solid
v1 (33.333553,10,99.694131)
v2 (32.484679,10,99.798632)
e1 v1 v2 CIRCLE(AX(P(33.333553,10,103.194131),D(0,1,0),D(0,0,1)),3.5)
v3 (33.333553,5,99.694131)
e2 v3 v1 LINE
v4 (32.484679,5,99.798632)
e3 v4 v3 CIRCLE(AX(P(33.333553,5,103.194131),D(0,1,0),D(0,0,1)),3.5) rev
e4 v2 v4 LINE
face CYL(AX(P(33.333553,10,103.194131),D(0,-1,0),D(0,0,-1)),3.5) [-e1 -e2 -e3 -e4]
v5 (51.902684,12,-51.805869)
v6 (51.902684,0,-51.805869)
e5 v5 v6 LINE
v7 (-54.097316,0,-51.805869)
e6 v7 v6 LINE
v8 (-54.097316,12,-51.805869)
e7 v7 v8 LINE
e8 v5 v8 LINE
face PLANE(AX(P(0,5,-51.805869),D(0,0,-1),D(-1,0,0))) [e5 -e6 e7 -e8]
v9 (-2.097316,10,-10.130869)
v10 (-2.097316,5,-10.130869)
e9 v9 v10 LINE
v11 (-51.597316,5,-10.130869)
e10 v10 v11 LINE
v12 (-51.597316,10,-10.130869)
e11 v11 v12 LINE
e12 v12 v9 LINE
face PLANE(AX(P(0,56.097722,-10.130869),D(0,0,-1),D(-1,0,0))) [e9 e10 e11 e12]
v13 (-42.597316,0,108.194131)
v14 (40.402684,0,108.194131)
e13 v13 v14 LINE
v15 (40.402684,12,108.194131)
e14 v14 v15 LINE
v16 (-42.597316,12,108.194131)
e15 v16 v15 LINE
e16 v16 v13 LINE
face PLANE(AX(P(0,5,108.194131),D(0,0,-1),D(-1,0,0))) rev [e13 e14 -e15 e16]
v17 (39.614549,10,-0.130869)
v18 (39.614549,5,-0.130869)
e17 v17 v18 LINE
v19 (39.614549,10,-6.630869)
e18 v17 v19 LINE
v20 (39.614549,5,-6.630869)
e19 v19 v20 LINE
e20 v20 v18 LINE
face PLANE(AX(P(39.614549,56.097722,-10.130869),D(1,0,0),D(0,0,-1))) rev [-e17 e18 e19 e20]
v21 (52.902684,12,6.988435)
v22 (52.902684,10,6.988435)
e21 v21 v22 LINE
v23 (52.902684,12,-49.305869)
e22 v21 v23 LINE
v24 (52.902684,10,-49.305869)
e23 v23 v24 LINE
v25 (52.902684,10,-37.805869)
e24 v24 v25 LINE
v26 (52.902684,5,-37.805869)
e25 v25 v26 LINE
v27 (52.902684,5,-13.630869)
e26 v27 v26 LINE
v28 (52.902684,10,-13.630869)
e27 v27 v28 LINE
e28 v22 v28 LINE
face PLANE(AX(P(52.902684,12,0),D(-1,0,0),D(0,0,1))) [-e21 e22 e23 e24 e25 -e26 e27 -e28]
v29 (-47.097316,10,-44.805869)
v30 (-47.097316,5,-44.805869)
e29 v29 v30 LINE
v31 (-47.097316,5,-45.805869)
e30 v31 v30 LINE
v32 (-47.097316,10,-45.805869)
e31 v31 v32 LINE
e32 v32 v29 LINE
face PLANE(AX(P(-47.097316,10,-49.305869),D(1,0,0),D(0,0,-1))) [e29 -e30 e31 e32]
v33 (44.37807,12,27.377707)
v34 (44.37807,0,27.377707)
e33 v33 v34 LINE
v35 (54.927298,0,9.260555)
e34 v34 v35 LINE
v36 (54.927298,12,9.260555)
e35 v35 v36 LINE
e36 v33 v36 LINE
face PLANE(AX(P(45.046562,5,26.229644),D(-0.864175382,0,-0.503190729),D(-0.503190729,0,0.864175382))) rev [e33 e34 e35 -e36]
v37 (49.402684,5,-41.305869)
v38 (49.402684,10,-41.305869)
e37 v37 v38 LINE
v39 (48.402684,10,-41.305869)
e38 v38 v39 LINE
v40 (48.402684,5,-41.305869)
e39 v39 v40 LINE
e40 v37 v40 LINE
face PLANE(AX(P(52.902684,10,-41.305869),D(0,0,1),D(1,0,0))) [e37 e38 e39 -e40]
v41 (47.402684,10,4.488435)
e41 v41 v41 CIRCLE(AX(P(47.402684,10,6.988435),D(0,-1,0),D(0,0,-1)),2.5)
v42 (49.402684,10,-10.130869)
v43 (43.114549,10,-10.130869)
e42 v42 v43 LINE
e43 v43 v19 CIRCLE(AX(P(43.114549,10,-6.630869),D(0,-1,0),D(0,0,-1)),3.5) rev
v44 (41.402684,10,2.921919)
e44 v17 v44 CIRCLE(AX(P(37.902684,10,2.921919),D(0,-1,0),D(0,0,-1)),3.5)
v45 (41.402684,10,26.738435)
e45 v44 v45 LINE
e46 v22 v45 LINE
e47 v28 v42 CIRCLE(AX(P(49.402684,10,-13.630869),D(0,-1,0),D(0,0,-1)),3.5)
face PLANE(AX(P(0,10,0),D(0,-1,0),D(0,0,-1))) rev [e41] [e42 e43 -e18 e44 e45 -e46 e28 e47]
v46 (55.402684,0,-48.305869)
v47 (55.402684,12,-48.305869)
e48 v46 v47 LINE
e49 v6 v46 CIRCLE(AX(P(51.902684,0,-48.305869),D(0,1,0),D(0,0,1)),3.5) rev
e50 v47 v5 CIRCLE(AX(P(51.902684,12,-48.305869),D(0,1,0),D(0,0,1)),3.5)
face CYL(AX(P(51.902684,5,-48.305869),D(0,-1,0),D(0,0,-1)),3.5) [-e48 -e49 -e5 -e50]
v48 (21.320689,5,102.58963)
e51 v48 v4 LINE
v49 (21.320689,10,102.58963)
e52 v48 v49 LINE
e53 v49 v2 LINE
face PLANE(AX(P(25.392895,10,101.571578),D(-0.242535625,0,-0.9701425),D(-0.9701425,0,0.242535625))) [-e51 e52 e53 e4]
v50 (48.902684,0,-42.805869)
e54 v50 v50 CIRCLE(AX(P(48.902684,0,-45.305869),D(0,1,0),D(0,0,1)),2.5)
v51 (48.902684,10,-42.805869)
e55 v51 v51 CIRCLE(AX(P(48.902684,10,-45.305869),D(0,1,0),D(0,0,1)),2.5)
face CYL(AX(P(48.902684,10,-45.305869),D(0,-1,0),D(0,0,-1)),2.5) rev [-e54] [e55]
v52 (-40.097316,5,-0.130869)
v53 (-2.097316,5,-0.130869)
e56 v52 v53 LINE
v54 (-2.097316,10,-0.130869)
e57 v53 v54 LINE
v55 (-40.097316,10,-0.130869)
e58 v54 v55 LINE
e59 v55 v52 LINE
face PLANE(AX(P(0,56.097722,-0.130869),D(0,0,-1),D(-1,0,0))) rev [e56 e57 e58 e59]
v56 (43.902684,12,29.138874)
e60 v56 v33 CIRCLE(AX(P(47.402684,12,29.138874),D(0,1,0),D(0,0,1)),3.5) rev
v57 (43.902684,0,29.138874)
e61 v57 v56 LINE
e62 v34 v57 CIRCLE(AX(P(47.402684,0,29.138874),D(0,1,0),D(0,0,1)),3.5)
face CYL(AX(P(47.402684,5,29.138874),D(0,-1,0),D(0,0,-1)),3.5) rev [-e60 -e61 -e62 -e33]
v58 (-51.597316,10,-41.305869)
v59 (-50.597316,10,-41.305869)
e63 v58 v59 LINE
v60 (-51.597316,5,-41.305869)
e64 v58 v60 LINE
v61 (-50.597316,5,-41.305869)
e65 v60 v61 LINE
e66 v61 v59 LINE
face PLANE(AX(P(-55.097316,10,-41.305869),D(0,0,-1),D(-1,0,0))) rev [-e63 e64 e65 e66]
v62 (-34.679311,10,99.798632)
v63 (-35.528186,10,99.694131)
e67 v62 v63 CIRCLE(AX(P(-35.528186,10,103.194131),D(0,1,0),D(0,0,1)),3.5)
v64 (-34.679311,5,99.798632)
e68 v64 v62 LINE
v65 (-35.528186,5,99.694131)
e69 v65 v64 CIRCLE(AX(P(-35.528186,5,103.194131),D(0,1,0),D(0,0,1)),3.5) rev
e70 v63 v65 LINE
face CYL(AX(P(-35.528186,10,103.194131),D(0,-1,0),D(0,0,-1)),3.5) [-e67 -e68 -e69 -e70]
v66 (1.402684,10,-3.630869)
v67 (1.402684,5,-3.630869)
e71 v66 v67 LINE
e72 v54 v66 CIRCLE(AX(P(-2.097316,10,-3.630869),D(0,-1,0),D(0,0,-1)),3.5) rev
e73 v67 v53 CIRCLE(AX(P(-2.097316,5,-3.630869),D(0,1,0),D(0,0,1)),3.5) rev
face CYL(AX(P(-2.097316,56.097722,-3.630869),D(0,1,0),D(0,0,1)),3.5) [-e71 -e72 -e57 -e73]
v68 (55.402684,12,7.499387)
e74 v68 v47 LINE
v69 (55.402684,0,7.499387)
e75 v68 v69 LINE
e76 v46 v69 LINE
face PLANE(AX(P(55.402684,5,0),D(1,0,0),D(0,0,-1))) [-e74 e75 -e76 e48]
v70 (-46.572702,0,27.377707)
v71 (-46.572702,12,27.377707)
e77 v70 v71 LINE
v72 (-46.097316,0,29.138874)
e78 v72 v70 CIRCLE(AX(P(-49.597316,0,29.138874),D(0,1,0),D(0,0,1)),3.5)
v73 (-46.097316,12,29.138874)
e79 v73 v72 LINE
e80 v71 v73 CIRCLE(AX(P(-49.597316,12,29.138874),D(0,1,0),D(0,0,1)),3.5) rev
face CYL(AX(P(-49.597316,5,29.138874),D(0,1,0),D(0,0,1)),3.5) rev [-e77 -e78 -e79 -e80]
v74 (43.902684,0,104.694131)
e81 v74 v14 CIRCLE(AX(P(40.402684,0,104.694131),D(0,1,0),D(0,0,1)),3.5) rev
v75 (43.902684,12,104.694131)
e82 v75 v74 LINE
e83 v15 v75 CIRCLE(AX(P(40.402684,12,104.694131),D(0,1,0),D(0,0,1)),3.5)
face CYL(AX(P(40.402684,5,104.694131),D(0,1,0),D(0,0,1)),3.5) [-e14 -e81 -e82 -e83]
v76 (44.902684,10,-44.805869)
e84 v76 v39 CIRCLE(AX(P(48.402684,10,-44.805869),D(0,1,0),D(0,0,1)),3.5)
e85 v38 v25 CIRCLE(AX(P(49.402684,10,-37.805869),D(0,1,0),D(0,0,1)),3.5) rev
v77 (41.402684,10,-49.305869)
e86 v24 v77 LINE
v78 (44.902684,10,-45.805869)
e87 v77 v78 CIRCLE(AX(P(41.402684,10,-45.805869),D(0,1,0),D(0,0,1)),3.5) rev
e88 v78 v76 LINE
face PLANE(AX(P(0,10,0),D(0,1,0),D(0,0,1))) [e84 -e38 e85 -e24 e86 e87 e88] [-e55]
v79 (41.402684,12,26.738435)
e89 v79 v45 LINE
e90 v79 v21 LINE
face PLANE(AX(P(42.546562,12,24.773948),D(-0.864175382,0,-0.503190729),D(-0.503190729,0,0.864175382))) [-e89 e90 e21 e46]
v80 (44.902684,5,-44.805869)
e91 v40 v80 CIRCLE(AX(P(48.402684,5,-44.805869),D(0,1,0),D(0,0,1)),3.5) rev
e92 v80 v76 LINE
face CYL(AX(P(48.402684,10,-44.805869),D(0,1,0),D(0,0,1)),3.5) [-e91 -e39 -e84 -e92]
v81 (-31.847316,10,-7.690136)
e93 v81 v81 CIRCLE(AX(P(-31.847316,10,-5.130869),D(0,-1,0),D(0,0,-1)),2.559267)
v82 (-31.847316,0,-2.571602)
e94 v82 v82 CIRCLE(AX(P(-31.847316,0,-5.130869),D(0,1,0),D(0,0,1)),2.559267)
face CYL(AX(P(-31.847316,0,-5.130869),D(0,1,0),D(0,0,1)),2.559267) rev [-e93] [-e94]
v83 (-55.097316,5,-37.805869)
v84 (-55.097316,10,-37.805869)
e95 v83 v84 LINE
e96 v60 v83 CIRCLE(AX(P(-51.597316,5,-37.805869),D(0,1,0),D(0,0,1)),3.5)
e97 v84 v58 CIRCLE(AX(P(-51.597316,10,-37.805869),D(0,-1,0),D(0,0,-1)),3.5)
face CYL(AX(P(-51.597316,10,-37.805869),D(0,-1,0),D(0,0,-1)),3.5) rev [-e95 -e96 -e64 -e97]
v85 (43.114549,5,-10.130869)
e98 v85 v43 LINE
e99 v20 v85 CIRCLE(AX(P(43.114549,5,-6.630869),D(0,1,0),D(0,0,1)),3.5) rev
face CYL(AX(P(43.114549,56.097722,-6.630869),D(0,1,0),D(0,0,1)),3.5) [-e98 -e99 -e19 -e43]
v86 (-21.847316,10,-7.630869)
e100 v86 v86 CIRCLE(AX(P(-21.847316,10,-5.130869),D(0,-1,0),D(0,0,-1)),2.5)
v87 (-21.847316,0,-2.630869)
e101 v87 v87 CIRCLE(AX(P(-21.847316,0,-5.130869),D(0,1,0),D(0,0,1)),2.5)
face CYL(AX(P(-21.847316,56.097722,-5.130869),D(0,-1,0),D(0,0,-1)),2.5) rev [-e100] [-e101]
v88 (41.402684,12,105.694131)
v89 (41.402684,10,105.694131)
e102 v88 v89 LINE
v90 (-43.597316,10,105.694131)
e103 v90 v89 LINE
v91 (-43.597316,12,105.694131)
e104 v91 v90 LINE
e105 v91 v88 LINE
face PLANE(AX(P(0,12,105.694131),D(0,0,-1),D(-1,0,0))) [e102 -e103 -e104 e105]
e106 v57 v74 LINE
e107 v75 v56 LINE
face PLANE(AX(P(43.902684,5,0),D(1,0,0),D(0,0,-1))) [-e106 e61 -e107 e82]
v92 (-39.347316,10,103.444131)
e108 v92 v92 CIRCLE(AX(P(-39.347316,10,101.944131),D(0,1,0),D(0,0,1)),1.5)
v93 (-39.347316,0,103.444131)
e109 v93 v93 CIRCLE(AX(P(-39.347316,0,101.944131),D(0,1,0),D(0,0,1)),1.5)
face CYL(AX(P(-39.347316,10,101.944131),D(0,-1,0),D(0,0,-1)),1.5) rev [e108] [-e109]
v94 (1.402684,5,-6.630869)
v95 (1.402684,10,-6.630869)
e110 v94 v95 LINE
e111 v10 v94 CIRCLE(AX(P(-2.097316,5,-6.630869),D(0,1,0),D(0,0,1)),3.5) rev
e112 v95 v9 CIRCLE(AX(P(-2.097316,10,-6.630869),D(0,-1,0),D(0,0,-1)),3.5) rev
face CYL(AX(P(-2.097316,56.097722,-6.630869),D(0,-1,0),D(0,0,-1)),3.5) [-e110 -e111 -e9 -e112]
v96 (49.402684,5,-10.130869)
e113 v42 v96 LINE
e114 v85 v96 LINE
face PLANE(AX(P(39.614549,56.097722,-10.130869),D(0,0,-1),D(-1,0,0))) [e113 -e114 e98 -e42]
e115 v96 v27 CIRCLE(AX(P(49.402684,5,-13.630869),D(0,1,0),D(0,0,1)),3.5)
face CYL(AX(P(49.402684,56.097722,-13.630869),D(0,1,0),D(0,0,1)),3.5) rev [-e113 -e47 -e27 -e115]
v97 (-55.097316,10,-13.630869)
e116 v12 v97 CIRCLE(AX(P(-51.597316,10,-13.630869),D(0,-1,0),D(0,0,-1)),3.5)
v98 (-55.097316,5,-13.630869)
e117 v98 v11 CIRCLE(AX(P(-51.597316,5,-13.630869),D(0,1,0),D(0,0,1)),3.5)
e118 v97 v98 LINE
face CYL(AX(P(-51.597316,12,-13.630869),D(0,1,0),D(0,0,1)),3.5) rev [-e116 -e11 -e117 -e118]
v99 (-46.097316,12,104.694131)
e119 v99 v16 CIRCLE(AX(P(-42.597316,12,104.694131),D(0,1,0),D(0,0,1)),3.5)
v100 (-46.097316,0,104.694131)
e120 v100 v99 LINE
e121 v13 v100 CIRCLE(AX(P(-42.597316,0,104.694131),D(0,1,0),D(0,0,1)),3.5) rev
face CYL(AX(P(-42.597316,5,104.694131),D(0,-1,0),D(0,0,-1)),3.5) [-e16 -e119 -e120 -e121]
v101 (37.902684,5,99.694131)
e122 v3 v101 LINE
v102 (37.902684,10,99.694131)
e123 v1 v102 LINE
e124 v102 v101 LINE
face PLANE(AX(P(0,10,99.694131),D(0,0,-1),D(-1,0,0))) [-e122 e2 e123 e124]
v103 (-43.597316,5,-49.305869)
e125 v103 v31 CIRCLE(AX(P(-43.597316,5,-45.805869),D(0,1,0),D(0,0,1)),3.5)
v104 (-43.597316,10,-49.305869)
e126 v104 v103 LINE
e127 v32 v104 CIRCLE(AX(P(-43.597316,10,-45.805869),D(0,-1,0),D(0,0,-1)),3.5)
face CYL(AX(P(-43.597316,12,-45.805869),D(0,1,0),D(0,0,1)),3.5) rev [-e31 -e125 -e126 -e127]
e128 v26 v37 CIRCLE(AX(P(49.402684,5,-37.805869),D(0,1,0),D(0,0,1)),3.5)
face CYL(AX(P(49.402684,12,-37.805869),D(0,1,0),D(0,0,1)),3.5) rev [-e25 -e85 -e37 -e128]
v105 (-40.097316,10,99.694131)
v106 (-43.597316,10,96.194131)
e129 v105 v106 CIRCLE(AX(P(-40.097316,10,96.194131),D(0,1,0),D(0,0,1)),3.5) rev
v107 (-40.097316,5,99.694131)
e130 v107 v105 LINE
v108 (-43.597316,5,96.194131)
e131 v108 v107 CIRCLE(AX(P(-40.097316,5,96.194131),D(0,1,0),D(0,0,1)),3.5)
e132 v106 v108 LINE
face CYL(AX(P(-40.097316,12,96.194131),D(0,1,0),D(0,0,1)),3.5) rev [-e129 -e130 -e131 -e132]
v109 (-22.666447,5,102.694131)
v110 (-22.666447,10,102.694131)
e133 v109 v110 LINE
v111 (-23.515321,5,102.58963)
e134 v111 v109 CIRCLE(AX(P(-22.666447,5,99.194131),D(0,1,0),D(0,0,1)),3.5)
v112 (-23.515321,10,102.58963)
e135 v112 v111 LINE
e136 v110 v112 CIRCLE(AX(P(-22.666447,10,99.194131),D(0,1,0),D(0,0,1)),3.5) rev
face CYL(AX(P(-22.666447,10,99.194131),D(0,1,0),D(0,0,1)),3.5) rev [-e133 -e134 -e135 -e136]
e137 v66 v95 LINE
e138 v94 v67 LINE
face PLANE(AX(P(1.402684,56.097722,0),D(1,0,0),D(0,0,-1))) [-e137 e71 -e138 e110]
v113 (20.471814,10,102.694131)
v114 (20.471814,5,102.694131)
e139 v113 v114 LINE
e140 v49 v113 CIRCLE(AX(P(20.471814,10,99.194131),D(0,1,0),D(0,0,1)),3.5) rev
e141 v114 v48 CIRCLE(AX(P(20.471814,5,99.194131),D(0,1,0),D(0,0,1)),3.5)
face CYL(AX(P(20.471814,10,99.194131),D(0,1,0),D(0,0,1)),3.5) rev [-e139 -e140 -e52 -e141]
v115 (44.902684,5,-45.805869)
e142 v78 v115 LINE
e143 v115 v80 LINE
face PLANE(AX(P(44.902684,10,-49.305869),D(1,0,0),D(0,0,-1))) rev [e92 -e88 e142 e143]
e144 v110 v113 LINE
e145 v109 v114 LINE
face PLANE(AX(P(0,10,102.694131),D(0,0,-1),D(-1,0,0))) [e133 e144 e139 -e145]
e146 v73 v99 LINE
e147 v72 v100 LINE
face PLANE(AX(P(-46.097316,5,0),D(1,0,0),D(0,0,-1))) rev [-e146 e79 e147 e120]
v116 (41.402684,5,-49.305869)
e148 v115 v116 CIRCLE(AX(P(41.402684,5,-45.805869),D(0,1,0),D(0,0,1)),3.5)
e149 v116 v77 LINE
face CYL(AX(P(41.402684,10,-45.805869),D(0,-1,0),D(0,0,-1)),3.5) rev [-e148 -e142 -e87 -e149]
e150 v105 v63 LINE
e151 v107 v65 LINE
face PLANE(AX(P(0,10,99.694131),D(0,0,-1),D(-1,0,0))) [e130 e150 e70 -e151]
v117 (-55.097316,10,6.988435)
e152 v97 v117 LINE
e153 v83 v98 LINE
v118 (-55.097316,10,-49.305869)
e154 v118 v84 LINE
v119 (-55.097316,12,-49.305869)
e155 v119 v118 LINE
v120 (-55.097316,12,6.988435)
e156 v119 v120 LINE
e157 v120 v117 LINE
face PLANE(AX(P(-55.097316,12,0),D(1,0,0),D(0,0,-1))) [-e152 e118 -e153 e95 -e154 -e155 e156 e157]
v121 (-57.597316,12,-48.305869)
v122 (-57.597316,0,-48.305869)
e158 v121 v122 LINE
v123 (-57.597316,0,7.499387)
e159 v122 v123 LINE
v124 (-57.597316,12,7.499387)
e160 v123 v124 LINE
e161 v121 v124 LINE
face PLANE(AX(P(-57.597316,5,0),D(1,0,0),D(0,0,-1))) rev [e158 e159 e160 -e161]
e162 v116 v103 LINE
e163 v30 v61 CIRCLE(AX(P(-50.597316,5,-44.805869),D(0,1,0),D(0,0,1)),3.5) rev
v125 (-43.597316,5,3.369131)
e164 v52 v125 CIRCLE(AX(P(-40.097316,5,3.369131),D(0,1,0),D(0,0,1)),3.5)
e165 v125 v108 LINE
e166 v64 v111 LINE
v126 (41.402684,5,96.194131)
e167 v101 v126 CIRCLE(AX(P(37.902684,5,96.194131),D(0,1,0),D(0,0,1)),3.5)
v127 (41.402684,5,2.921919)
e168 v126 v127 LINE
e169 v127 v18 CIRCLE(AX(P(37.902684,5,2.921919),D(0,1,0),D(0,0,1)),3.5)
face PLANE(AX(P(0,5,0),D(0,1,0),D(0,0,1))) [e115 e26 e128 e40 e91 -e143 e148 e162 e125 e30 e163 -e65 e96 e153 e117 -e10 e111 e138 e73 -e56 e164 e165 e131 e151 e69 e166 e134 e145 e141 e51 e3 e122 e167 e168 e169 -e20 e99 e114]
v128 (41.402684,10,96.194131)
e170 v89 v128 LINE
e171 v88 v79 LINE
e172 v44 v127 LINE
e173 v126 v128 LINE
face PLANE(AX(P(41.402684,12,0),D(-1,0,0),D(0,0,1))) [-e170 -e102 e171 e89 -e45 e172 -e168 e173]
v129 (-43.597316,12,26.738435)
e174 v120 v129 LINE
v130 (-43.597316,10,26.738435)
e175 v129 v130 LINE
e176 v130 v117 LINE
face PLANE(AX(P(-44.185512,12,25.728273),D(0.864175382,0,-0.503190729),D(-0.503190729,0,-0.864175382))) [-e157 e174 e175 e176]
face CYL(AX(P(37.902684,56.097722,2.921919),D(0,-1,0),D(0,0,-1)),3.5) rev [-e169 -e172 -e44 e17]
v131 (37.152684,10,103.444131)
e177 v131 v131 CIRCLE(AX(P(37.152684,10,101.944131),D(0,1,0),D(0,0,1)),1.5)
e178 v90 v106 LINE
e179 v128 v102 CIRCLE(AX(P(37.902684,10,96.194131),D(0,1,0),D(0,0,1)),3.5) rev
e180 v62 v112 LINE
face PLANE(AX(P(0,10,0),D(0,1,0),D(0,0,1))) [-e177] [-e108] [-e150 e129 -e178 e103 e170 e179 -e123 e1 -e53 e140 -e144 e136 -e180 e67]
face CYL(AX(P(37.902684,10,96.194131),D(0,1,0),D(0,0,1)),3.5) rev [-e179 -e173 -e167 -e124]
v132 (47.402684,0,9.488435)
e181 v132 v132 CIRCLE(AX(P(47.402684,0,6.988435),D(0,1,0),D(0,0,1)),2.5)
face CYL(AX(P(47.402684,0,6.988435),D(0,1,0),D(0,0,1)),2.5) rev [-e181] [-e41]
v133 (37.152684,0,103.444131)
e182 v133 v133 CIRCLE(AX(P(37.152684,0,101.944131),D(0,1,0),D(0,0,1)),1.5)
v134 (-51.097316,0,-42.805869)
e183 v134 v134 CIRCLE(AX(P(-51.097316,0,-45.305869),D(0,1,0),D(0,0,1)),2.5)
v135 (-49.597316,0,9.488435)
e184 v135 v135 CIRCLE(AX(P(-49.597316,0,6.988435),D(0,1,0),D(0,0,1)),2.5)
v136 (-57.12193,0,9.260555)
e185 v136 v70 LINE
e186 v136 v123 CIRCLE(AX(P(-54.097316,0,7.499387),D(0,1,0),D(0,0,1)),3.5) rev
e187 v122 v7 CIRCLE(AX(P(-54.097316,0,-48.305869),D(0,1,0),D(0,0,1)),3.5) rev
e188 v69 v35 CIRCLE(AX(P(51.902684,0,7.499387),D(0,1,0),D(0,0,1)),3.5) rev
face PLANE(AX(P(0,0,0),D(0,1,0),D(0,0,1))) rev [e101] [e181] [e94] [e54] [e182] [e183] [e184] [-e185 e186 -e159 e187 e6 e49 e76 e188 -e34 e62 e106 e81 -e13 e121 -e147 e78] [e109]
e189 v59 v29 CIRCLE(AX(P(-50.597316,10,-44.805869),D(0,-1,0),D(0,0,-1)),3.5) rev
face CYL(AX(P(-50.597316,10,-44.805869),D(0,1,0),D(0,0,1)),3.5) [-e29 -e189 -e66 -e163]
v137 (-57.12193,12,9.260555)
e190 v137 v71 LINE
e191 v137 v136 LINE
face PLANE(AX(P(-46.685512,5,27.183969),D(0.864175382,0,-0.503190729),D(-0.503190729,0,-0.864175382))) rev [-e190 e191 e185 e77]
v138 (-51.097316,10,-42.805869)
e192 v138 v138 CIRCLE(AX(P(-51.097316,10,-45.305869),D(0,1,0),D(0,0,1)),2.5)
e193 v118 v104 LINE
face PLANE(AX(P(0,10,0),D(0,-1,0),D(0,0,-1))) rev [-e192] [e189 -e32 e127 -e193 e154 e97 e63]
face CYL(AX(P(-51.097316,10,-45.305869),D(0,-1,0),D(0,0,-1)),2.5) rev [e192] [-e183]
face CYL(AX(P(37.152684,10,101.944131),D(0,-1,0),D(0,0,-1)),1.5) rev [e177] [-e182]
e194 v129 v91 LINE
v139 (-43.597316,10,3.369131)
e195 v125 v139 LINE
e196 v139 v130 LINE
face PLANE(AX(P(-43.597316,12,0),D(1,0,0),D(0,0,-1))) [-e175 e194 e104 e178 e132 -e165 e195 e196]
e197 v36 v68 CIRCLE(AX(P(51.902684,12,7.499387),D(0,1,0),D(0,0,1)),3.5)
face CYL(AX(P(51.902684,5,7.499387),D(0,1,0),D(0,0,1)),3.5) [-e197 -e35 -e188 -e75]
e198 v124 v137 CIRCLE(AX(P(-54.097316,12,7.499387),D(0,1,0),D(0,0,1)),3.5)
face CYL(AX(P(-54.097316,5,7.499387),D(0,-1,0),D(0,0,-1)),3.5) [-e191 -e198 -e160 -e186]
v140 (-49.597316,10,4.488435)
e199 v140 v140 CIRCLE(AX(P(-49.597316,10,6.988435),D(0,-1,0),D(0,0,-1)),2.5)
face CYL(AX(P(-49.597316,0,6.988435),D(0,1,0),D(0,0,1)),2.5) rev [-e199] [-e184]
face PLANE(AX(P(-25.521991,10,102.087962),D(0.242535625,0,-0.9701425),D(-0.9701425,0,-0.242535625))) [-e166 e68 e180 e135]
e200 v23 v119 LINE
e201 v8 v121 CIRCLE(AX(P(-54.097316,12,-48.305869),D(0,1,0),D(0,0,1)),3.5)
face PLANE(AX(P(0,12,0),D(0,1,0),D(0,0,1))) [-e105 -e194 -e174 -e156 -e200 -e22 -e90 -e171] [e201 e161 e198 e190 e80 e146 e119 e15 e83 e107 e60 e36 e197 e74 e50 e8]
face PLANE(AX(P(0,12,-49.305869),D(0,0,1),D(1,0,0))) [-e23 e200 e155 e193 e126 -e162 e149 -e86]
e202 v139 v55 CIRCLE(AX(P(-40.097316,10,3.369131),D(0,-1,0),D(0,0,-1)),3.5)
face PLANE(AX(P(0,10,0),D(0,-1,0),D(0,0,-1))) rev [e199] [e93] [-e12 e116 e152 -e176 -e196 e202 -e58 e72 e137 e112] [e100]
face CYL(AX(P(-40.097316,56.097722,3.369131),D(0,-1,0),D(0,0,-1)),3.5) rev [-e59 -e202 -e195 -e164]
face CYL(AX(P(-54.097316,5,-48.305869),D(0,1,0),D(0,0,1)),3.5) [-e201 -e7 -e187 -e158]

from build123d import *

# Parameters (mm, degrees)
BOSS_EXTRUDE1_DEPTH     = 5
BOSS_EXTRUDE2_DEPTH     = 7
SKETCH3_R               = 1.5
SKETCH3_W               = 8
SKETCH3_H               = 8
SKETCH3_R_2             = 2.5
BOSS_EXTRUDE3_DEPTH     = 5
SKETCH4_R               = 2.5
BOSS_EXTRUDE4_DEPTH     = 5
CUT_EXTRUDE1_DEPTH      = 123.769787834
CUT_EXTRUDE1_DEPTH_BACK = 123.769787834
SKETCH5_R               = 2.5
SKETCH5_R_2             = 2.55926668
SKETCH5_R_3             = 1.5
FILLET1_R               = 3.5


with BuildPart() as part:
    # Sketch1 → Boss-Extrude1 (new body)
    with BuildSketch(Plane(origin=(0, 0, 0), x_dir=(1, 0, 0), z_dir=(0, 1, 0))):
        Polygon((-57.597316241, 51.805869074), (-57.597316241, -8.444130926), (-46.097316241, -28.194130926), (-46.097316241, -108.194130926), (43.902683759, -108.194130926), (43.902683759, -28.194130926), (55.402683759, -8.444130926), (55.402683759, 51.805869074), align=None)
    extrude(amount=BOSS_EXTRUDE1_DEPTH)

    # Sketch2 → Boss-Extrude2 (add)
    with BuildSketch(Plane(origin=(0, 5, 0), x_dir=(1, 0, 0), z_dir=(0, 1, 0))):
        Polygon((-46.097316241, -28.194130926), (-46.097316241, -108.194130926), (43.902683759, -108.194130926), (43.902683759, -28.194130926), (41.402683759, -28.194130926), (41.402683759, -105.694130926), (-43.597316241, -105.694130926), (-43.597316241, -28.194130926), align=None)
        Polygon((52.902683759, -6.988434723), (55.402683759, -8.444130926), (43.902683759, -28.194130926), (41.402683759, -26.738434723), align=None)
        Polygon((41.402683759, -28.194130926), (43.902683759, -28.194130926), (41.402683759, -26.738434723), align=None)
        Polygon((52.902683759, -6.988434723), (55.402683759, -8.444130926), (55.402683759, -6.988434723), align=None)
        Polygon((-57.597316241, 51.805869074), (-57.597316241, -6.988434723), (-55.097316241, -6.988434723), (-55.097316241, 49.305869074), (52.902683759, 49.305869074), (52.902683759, -6.988434723), (55.402683759, -6.988434723), (55.402683759, 51.805869074), align=None)
        Polygon((-43.597316241, -26.738434723), (-46.097316241, -28.194130926), (-43.597316241, -28.194130926), align=None)
        Polygon((-43.597316241, -26.738434723), (-46.097316241, -28.194130926), (-57.597316241, -8.444130926), (-55.097316241, -6.988434723), align=None)
        Polygon((-57.597316241, -6.988434723), (-57.597316241, -8.444130926), (-55.097316241, -6.988434723), align=None)
    extrude(amount=BOSS_EXTRUDE2_DEPTH)

    # Sketch3 → Boss-Extrude3 (add)
    # profile 1 of 3: a face of its own
    with BuildSketch(Plane(origin=(0, 5, 0), x_dir=(1, 0, 0), z_dir=(0, 1, 0))):
        Polygon((-43.597316241, -99.694130926), (-43.597316241, -105.694130926), (41.402683759, -105.694130926), (41.402683759, -99.694130926), (32.902683759, -99.694130926), (20.902683759, -102.694130926), (-23.097316241, -102.694130926), (-35.097316241, -99.694130926), align=None)
        with Locations(Location((-39.347316241, -101.944130926, 0), (0, 0, 270))):
            Circle(SKETCH3_R, mode=Mode.SUBTRACT)
        with Locations(Location((37.152683759, -101.944130926, 0), (0, 0, 270))):
            Circle(SKETCH3_R, mode=Mode.SUBTRACT)
    # profile 2 of 3: a face of its own
    with BuildSketch(Plane(origin=(0, 5, 0), x_dir=(1, 0, 0), z_dir=(0, 1, 0))):
        with Locations((-51.097316241, 45.305869074)):
            Rectangle(SKETCH3_W, SKETCH3_H)
        with Locations(Location((-51.097316241, 45.305869074, 0), (0, 0, 270))):
            Circle(SKETCH3_R_2, mode=Mode.SUBTRACT)
    # profile 3 of 3: a face of its own
    with BuildSketch(Plane(origin=(0, 5, 0), x_dir=(1, 0, 0), z_dir=(0, 1, 0))):
        with Locations((48.902683759, 45.305869074)):
            Rectangle(SKETCH3_W, SKETCH3_H)
        with Locations(Location((48.902683759, 45.305869074, 0), (0, 0, 270))):
            Circle(SKETCH3_R_2, mode=Mode.SUBTRACT)
    extrude(amount=BOSS_EXTRUDE3_DEPTH)

    # Sketch4 → Boss-Extrude4 (add)
    # profile 1 of 2: a face of its own
    with BuildSketch(Plane(origin=(0, 5, 0), x_dir=(1, 0, 0), z_dir=(0, 1, 0))):
        Polygon((1.402683759, 10.130869074), (-55.097316241, 10.130869074), (-55.097316241, -6.988434723), (-43.597316241, -26.738434723), (-43.597316241, 0.130869074), (1.402683759, 0.130869074), align=None)
        with Locations(Location((-31.847316241, 5.130869074, 0), (0, 0, 90))):
            Circle(SKETCH4_R, mode=Mode.SUBTRACT)
        with Locations(Location((-21.847316241, 5.130869074, 0), (0, 0, 90))):
            Circle(SKETCH4_R, mode=Mode.SUBTRACT)
    # profile 2 of 2: a face of its own
    with BuildSketch(Plane(origin=(0, 5, 0), x_dir=(1, 0, 0), z_dir=(0, 1, 0))):
        Polygon((39.6145491, 10.130869074), (39.6145491, 0.130869074), (41.402683759, 0.130869074), (41.402683759, -26.738434723), (52.902683759, -6.988434723), (52.902683759, 10.130869074), align=None)
    extrude(amount=BOSS_EXTRUDE4_DEPTH)

    # Sketch5 → Cut-Extrude1 (cut, two sides: drawn at the far end of the back side and taken through both)
    with BuildSketch(Plane(origin=(0, 5, 0), x_dir=(1, 0, 0), z_dir=(0, 1, 0)).offset(-CUT_EXTRUDE1_DEPTH_BACK)):
        with Locations(Location((-21.847316241, 5.130869074, 0), (0, 0, 90))):
            Circle(SKETCH5_R)
        with Locations(Location((-31.847316241, 5.130869074, 0), (0, 0, 270))):
            Circle(SKETCH5_R_2)
        with Locations(Location((-39.347316241, -101.944130926, 0), (0, 0, 270))):
            Circle(SKETCH5_R_3)
        with Locations(Location((37.152683759, -101.944130926, 0), (0, 0, 270))):
            Circle(SKETCH5_R_3)
        with Locations(Location((-51.097316241, 45.305869074, 0), (0, 0, 270))):
            Circle(SKETCH5_R)
        with Locations(Location((48.902683759, 45.305869074, 0), (0, 0, 270))):
            Circle(SKETCH5_R)
        with Locations(Location((-49.597316241, -6.988434723, 0), (0, 0, 270))):
            Circle(SKETCH5_R)
        with Locations(Location((47.402683759, -6.988434723, 0), (0, 0, 270))):
            Circle(SKETCH5_R)
    extrude(amount=CUT_EXTRUDE1_DEPTH + CUT_EXTRUDE1_DEPTH_BACK, mode=Mode.SUBTRACT)

    # Fillet1
    # the kernel refuses this fillet: 3.5 mm, written as the material it adds along each edge
    with BuildSketch(Plane(origin=(41.402683759, 5, 99.694130926), x_dir=(0, 0, -1), z_dir=(0, 1, 0)), Plane(origin=(-55.097316241, 5, -41.305869074), x_dir=(0, 0, 1), z_dir=(0, 1, 0)), Plane(origin=(44.902683759, 5, -49.305869074), x_dir=(-1, 0, 0), z_dir=(0, 1, 0)), Plane(origin=(52.902683759, 5, -10.130869074), x_dir=(0, 0, -1), z_dir=(0, 1, 0)), Plane(origin=(-43.597316241, 5, -0.130869074), x_dir=(0, 0, 1), z_dir=(0, 1, 0))) as fillet1_piece_1:
        with BuildLine():
            CenterArc((FILLET1_R, FILLET1_R), FILLET1_R, 180, 90)
            Line((0, FILLET1_R), (0, 0))
            Line((0, 0), (FILLET1_R, 0))
        make_face()
    extrude(amount=5)
    with BuildSketch(Plane(origin=(20.902683759, 3.922825776, 102.694130926), x_dir=(-1, 0, 0), z_dir=(0, 1, 0)), Plane(origin=(-23.097316241, 3.922825776, 102.694130926), x_dir=(-0.9701425001453338, 0, -0.2425356250363252), z_dir=(0, 1, 0))) as fillet1_piece_2:
        with BuildLine():
            CenterArc((FILLET1_R * 0.123105625618, -FILLET1_R), FILLET1_R, 90, 14.036243468)
            Line((-FILLET1_R * 0.119429999419, -FILLET1_R * 0.0298574998547), (0, 0))
            Line((0, 0), (FILLET1_R * 0.123105625618, 0))
        make_face()
    extrude(amount=6.077174224)
    with BuildSketch(Plane(origin=(-43.597316241, 5, 99.694130926), x_dir=(0, 0, -1), z_dir=(0, 1, 0)), Plane(origin=(-47.097316241, 5, -49.305869074), x_dir=(1, 0, 0), z_dir=(0, 1, 0)), Plane(origin=(52.902683759, 5, -41.305869074), x_dir=(0, 0, 1), z_dir=(0, 1, 0)), Plane(origin=(-55.097316241, 5, -10.130869074), x_dir=(0, 0, -1), z_dir=(0, 1, 0))) as fillet1_piece_3:
        with BuildLine():
            CenterArc((FILLET1_R, -FILLET1_R), FILLET1_R, 90, 90)
            Line((0, -FILLET1_R), (0, 0))
            Line((0, 0), (FILLET1_R, 0))
        make_face()
    extrude(amount=5)
    with BuildSketch(Plane(origin=(43.902683759, 12, 28.194130926), x_dir=(0.5031907286678252, 0, -0.864175381842565), z_dir=(0, -1, 0)), Plane(origin=(-46.097316241, 0, 28.194130926), x_dir=(-0.5031907286678269, 0, -0.8641753818425641), z_dir=(0, 1, 0))) as fillet1_piece_4:
        with BuildLine():
            CenterArc((FILLET1_R * 0.269926710528, FILLET1_R), FILLET1_R, 239.788677614, 30.211322386)
            Line((-FILLET1_R * 0.23326401814, FILLET1_R * 0.135824618157), (0, 0))
            Line((0, 0), (FILLET1_R * 0.269926710528, 0))
        make_face()
    extrude(amount=12)
    with BuildSketch(Plane(origin=(41.402683759, 5, -0.130869074), x_dir=(0, 0, 1), z_dir=(0, 1, 0))) as fillet1_piece_5:
        with BuildLine():
            CenterArc((3.052788407, -3.5), FILLET1_R, 90, 60.718267745)
            Line((0, -1.788134659), (0, 0))
            Line((0, 0), (3.052788407, 0))
        make_face()
    extrude(amount=5)
    # the kernel refuses this fillet: 3.5 mm, written as the material it takes off along each edge
    with BuildSketch(Plane(origin=(32.902683759, 5, 99.694130926), x_dir=(1, 0, 0), z_dir=(0, 1, 0)), Plane(origin=(-35.097316241, 5, 99.694130926), x_dir=(0.9701425001453338, 0, 0.2425356250363252), z_dir=(0, 1, 0))) as fillet1_2_piece_1:
        with BuildLine():
            CenterArc((FILLET1_R * 0.123105625618, -FILLET1_R), FILLET1_R, 90, 14.036243468)
            Line((-FILLET1_R * 0.119429999419, -FILLET1_R * 0.0298574998547), (0, 0))
            Line((0, 0), (FILLET1_R * 0.123105625618, 0))
        make_face()
    extrude(amount=6.077174224, mode=Mode.SUBTRACT)
    with BuildSketch(Plane(origin=(-47.097316241, 5, -41.305869074), x_dir=(-1, 0, 0), z_dir=(0, 1, 0)), Plane(origin=(44.902683759, 5, -41.305869074), x_dir=(0, 0, -1), z_dir=(0, 1, 0)), Plane(origin=(39.6145491, 5, -10.130869074), x_dir=(1, 0, 0), z_dir=(0, 1, 0)), Plane(origin=(1.402683759, 5, -10.130869074), x_dir=(0, 0, 1), z_dir=(0, 1, 0))) as fillet1_2_piece_2:
        with BuildLine():
            CenterArc((FILLET1_R, -FILLET1_R), FILLET1_R, 90, 90)
            Line((0, -FILLET1_R), (0, 0))
            Line((0, 0), (FILLET1_R, 0))
        make_face()
    extrude(amount=13.75, mode=Mode.SUBTRACT)
    with BuildSketch(Plane(origin=(55.402683759, 14.361858717, 8.444130926), x_dir=(0, 0, -1), z_dir=(0, -1, 0)), Plane(origin=(-57.597316241, -2.361858717, 8.444130926), x_dir=(0, 0, -1), z_dir=(0, 1, 0))) as fillet1_2_piece_3:
        with BuildLine():
            CenterArc((FILLET1_R * 0.269926710528, -FILLET1_R), FILLET1_R, 90, 30.211322386)
            Line((-FILLET1_R * 0.23326401814, -FILLET1_R * 0.135824618157), (0, 0))
            Line((0, 0), (FILLET1_R * 0.269926710528, 0))
        make_face()
    extrude(amount=16.723717434, mode=Mode.SUBTRACT)
    with BuildSketch(Plane(origin=(43.902683759, 20.75, 108.194130926), x_dir=(-1, 0, 0), z_dir=(0, -1, 0))) as fillet1_2_piece_4:
        with BuildLine():
            CenterArc((FILLET1_R, FILLET1_R), FILLET1_R, 180, 90)
            Line((0, FILLET1_R), (0, 0))
            Line((0, 0), (FILLET1_R, 0))
        make_face()
    extrude(amount=29.5, mode=Mode.SUBTRACT)
    with BuildSketch(Plane(origin=(-46.097316241, -8.75, 108.194130926), x_dir=(0, 0, -1), z_dir=(0, 1, 0)), Plane(origin=(-57.597316241, -8.75, -51.805869074), x_dir=(1, 0, 0), z_dir=(0, 1, 0)), Plane(origin=(55.402683759, -8.75, -51.805869074), x_dir=(0, 0, 1), z_dir=(0, 1, 0))) as fillet1_2_piece_5:
        with BuildLine():
            CenterArc((FILLET1_R, -FILLET1_R), FILLET1_R, 90, 90)
            Line((0, -FILLET1_R), (0, 0))
            Line((0, 0), (FILLET1_R, 0))
        make_face()
    extrude(amount=29.5, mode=Mode.SUBTRACT)
    with BuildSketch(Plane(origin=(1.402683759, 5, -0.130869074), x_dir=(0, 0, -1), z_dir=(0, 1, 0))) as fillet1_2_piece_6:
        with BuildLine():
            CenterArc((FILLET1_R, FILLET1_R), FILLET1_R, 180, 90)
            Line((0, FILLET1_R), (0, 0))
            Line((0, 0), (FILLET1_R, 0))
        make_face()
    extrude(amount=13.75, mode=Mode.SUBTRACT)


solid = part.part
